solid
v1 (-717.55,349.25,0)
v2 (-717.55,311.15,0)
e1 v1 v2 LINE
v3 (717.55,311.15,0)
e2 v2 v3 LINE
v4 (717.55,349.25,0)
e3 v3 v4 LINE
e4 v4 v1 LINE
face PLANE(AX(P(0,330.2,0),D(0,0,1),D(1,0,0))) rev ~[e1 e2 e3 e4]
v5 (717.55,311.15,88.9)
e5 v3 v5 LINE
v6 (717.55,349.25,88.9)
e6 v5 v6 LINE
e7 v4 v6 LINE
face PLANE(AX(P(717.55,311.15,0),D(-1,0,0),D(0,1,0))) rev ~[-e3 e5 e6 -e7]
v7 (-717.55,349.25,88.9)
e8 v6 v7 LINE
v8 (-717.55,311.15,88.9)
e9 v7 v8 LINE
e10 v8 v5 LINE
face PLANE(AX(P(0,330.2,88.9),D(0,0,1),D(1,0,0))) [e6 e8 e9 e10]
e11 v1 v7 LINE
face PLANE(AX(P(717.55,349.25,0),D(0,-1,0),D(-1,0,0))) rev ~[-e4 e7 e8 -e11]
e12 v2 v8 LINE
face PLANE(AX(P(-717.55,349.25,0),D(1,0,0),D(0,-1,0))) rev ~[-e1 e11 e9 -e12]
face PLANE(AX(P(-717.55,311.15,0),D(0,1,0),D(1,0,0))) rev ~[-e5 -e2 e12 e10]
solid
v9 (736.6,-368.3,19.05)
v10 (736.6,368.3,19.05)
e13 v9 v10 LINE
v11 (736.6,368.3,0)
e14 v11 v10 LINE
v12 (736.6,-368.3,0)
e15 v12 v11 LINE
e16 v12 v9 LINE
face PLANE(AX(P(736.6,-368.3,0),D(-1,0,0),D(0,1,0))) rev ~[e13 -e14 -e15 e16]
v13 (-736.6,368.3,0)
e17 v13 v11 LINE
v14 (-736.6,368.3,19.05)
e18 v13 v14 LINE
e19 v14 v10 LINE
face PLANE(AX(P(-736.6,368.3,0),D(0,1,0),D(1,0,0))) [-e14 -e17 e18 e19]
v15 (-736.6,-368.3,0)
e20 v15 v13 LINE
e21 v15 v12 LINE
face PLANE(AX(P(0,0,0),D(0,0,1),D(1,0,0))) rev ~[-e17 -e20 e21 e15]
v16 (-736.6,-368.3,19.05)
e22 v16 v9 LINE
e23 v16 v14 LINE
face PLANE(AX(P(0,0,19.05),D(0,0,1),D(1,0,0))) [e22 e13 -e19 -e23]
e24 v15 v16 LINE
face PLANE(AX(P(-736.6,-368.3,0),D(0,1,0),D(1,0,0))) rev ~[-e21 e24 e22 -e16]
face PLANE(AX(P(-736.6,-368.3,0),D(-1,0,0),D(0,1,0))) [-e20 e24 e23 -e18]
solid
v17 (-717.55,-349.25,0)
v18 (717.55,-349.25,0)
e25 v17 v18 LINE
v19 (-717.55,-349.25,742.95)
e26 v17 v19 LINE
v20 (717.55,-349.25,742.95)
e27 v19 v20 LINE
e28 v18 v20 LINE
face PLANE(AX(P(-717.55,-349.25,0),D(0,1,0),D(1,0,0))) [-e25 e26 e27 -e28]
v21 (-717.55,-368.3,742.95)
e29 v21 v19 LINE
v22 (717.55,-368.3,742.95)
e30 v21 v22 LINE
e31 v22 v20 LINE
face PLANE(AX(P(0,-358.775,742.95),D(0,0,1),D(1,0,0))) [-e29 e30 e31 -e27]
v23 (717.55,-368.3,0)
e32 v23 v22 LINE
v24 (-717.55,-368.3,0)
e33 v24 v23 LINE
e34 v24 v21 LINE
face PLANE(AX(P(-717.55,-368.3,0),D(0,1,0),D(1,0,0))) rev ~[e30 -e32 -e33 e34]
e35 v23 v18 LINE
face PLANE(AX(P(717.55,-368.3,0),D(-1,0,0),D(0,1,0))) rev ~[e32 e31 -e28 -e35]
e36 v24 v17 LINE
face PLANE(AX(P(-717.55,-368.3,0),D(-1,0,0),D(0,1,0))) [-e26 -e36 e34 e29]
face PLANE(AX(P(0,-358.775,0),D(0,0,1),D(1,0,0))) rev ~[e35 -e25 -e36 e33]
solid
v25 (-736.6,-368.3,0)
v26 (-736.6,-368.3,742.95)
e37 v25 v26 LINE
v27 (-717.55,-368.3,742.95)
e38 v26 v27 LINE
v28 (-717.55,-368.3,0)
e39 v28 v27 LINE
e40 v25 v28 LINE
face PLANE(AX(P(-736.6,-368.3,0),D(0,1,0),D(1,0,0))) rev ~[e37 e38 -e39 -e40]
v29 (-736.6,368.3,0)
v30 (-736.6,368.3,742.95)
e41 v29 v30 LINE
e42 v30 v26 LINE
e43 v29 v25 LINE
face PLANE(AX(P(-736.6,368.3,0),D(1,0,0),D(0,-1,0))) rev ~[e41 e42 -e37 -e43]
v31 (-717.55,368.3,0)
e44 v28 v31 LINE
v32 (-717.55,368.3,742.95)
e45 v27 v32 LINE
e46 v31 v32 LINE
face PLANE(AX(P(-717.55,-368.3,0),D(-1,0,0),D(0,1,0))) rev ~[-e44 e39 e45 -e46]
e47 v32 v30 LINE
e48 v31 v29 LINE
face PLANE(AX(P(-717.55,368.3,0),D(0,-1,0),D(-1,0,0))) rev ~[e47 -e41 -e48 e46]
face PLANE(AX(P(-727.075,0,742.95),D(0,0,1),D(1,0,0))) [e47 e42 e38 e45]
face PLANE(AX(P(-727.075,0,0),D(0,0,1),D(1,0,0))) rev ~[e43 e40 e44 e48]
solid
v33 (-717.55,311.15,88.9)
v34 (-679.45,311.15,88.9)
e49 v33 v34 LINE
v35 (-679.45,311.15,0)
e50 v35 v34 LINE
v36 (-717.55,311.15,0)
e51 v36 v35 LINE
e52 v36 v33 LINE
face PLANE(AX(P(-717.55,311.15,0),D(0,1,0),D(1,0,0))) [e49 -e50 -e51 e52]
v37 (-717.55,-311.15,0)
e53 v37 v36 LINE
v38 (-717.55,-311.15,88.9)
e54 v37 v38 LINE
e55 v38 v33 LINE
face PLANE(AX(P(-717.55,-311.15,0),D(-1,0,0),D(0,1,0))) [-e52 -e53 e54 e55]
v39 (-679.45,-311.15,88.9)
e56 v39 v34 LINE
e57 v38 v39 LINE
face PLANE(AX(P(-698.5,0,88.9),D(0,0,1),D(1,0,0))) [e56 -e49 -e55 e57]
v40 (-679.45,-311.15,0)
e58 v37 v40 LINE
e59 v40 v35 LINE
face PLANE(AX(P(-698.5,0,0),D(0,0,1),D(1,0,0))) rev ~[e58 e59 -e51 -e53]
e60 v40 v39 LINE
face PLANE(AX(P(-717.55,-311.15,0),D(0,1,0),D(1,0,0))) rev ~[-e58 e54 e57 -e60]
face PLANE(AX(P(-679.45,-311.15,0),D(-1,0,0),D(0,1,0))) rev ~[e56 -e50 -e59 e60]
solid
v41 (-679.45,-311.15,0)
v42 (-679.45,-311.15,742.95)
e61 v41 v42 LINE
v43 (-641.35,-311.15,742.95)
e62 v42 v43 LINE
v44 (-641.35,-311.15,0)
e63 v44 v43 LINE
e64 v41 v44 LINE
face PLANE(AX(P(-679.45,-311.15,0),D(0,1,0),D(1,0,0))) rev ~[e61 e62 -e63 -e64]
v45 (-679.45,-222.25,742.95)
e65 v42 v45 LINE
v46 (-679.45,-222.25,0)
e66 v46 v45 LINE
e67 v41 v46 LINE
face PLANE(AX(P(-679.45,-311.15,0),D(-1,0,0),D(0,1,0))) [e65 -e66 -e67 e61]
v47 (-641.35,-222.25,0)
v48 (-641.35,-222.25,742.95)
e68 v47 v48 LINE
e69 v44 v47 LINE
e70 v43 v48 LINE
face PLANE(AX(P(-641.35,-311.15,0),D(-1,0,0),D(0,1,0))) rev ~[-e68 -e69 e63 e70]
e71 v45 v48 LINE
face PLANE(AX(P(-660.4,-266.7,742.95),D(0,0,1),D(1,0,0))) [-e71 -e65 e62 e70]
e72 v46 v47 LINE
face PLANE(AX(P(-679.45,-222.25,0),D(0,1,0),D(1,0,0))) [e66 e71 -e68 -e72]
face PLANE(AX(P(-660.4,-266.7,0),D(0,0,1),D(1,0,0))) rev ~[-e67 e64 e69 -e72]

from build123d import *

# Parameters (mm, degrees)
F4_W      = 1473.2
F4_H      = 736.6
F7_DEPTH  = 19.05
F8_DEPTH  = 742.95
F5_W      = 1435.1
F5_H      = 19.05
F9_DEPTH  = 742.95
F10_DEPTH = 88.9
F5_W_2    = 38.1
F5_H_2    = 622.3
F11_DEPTH = 88.9
F6_W      = 38.1
F6_H      = 88.9
F12_DEPTH = 742.95


# Not quite as in the source:
# - a length typed as a fraction of an inch, garbled in the dataset ("3 / 203.2 mm" for 3/8 in), is restored


with BuildPart() as f7:
    # F4 (on Top) → F7 (new body)
    with BuildSketch(Plane.XY):
        Rectangle(F4_W, F4_H)
    extrude(amount=F7_DEPTH)


with BuildPart() as f8:
    # F5 (on Top) → F8 (new body)
    with BuildSketch(Plane.XY):
        Polygon((-717.55, 368.3), (-736.6, 368.3), (-736.6, -368.3), (-717.55, -368.3), (-717.55, -349.25), (-717.55, -311.15), (-717.55, 311.15), (-717.55, 349.25), align=None)
    extrude(amount=F8_DEPTH)


with BuildPart() as f9:
    # F5 (on Top) → F9 (new body)
    with BuildSketch(Plane.XY):
        with Locations((0, -358.775)):
            Rectangle(F5_W, F5_H)
    extrude(amount=F9_DEPTH)


with BuildPart() as f10:
    # F5 (on Top) → F10 (new body)
    with BuildSketch(Plane.XY):
        Polygon((717.55, 349.25), (-717.55, 349.25), (-717.55, 311.15), (-679.45, 311.15), (-57.15, 311.15), (-19.05, 311.15), (679.45, 311.15), (717.55, 311.15), align=None)
    extrude(amount=F10_DEPTH)


with BuildPart() as f11:
    # F5 (on Top) → F11 (new body)
    with BuildSketch(Plane.XY):
        with Locations((-698.5, 0)):
            Rectangle(F5_W_2, F5_H_2)
    extrude(amount=F11_DEPTH)


with BuildPart() as f12:
    # F6 (on Top) → F12 (new body)
    with BuildSketch(Plane.XY):
        with Locations((-660.4, -266.7)):
            Rectangle(F6_W, F6_H)
    extrude(amount=F12_DEPTH)


solid = Compound([f7.part, f8.part, f9.part, f10.part, f11.part, f12.part])
